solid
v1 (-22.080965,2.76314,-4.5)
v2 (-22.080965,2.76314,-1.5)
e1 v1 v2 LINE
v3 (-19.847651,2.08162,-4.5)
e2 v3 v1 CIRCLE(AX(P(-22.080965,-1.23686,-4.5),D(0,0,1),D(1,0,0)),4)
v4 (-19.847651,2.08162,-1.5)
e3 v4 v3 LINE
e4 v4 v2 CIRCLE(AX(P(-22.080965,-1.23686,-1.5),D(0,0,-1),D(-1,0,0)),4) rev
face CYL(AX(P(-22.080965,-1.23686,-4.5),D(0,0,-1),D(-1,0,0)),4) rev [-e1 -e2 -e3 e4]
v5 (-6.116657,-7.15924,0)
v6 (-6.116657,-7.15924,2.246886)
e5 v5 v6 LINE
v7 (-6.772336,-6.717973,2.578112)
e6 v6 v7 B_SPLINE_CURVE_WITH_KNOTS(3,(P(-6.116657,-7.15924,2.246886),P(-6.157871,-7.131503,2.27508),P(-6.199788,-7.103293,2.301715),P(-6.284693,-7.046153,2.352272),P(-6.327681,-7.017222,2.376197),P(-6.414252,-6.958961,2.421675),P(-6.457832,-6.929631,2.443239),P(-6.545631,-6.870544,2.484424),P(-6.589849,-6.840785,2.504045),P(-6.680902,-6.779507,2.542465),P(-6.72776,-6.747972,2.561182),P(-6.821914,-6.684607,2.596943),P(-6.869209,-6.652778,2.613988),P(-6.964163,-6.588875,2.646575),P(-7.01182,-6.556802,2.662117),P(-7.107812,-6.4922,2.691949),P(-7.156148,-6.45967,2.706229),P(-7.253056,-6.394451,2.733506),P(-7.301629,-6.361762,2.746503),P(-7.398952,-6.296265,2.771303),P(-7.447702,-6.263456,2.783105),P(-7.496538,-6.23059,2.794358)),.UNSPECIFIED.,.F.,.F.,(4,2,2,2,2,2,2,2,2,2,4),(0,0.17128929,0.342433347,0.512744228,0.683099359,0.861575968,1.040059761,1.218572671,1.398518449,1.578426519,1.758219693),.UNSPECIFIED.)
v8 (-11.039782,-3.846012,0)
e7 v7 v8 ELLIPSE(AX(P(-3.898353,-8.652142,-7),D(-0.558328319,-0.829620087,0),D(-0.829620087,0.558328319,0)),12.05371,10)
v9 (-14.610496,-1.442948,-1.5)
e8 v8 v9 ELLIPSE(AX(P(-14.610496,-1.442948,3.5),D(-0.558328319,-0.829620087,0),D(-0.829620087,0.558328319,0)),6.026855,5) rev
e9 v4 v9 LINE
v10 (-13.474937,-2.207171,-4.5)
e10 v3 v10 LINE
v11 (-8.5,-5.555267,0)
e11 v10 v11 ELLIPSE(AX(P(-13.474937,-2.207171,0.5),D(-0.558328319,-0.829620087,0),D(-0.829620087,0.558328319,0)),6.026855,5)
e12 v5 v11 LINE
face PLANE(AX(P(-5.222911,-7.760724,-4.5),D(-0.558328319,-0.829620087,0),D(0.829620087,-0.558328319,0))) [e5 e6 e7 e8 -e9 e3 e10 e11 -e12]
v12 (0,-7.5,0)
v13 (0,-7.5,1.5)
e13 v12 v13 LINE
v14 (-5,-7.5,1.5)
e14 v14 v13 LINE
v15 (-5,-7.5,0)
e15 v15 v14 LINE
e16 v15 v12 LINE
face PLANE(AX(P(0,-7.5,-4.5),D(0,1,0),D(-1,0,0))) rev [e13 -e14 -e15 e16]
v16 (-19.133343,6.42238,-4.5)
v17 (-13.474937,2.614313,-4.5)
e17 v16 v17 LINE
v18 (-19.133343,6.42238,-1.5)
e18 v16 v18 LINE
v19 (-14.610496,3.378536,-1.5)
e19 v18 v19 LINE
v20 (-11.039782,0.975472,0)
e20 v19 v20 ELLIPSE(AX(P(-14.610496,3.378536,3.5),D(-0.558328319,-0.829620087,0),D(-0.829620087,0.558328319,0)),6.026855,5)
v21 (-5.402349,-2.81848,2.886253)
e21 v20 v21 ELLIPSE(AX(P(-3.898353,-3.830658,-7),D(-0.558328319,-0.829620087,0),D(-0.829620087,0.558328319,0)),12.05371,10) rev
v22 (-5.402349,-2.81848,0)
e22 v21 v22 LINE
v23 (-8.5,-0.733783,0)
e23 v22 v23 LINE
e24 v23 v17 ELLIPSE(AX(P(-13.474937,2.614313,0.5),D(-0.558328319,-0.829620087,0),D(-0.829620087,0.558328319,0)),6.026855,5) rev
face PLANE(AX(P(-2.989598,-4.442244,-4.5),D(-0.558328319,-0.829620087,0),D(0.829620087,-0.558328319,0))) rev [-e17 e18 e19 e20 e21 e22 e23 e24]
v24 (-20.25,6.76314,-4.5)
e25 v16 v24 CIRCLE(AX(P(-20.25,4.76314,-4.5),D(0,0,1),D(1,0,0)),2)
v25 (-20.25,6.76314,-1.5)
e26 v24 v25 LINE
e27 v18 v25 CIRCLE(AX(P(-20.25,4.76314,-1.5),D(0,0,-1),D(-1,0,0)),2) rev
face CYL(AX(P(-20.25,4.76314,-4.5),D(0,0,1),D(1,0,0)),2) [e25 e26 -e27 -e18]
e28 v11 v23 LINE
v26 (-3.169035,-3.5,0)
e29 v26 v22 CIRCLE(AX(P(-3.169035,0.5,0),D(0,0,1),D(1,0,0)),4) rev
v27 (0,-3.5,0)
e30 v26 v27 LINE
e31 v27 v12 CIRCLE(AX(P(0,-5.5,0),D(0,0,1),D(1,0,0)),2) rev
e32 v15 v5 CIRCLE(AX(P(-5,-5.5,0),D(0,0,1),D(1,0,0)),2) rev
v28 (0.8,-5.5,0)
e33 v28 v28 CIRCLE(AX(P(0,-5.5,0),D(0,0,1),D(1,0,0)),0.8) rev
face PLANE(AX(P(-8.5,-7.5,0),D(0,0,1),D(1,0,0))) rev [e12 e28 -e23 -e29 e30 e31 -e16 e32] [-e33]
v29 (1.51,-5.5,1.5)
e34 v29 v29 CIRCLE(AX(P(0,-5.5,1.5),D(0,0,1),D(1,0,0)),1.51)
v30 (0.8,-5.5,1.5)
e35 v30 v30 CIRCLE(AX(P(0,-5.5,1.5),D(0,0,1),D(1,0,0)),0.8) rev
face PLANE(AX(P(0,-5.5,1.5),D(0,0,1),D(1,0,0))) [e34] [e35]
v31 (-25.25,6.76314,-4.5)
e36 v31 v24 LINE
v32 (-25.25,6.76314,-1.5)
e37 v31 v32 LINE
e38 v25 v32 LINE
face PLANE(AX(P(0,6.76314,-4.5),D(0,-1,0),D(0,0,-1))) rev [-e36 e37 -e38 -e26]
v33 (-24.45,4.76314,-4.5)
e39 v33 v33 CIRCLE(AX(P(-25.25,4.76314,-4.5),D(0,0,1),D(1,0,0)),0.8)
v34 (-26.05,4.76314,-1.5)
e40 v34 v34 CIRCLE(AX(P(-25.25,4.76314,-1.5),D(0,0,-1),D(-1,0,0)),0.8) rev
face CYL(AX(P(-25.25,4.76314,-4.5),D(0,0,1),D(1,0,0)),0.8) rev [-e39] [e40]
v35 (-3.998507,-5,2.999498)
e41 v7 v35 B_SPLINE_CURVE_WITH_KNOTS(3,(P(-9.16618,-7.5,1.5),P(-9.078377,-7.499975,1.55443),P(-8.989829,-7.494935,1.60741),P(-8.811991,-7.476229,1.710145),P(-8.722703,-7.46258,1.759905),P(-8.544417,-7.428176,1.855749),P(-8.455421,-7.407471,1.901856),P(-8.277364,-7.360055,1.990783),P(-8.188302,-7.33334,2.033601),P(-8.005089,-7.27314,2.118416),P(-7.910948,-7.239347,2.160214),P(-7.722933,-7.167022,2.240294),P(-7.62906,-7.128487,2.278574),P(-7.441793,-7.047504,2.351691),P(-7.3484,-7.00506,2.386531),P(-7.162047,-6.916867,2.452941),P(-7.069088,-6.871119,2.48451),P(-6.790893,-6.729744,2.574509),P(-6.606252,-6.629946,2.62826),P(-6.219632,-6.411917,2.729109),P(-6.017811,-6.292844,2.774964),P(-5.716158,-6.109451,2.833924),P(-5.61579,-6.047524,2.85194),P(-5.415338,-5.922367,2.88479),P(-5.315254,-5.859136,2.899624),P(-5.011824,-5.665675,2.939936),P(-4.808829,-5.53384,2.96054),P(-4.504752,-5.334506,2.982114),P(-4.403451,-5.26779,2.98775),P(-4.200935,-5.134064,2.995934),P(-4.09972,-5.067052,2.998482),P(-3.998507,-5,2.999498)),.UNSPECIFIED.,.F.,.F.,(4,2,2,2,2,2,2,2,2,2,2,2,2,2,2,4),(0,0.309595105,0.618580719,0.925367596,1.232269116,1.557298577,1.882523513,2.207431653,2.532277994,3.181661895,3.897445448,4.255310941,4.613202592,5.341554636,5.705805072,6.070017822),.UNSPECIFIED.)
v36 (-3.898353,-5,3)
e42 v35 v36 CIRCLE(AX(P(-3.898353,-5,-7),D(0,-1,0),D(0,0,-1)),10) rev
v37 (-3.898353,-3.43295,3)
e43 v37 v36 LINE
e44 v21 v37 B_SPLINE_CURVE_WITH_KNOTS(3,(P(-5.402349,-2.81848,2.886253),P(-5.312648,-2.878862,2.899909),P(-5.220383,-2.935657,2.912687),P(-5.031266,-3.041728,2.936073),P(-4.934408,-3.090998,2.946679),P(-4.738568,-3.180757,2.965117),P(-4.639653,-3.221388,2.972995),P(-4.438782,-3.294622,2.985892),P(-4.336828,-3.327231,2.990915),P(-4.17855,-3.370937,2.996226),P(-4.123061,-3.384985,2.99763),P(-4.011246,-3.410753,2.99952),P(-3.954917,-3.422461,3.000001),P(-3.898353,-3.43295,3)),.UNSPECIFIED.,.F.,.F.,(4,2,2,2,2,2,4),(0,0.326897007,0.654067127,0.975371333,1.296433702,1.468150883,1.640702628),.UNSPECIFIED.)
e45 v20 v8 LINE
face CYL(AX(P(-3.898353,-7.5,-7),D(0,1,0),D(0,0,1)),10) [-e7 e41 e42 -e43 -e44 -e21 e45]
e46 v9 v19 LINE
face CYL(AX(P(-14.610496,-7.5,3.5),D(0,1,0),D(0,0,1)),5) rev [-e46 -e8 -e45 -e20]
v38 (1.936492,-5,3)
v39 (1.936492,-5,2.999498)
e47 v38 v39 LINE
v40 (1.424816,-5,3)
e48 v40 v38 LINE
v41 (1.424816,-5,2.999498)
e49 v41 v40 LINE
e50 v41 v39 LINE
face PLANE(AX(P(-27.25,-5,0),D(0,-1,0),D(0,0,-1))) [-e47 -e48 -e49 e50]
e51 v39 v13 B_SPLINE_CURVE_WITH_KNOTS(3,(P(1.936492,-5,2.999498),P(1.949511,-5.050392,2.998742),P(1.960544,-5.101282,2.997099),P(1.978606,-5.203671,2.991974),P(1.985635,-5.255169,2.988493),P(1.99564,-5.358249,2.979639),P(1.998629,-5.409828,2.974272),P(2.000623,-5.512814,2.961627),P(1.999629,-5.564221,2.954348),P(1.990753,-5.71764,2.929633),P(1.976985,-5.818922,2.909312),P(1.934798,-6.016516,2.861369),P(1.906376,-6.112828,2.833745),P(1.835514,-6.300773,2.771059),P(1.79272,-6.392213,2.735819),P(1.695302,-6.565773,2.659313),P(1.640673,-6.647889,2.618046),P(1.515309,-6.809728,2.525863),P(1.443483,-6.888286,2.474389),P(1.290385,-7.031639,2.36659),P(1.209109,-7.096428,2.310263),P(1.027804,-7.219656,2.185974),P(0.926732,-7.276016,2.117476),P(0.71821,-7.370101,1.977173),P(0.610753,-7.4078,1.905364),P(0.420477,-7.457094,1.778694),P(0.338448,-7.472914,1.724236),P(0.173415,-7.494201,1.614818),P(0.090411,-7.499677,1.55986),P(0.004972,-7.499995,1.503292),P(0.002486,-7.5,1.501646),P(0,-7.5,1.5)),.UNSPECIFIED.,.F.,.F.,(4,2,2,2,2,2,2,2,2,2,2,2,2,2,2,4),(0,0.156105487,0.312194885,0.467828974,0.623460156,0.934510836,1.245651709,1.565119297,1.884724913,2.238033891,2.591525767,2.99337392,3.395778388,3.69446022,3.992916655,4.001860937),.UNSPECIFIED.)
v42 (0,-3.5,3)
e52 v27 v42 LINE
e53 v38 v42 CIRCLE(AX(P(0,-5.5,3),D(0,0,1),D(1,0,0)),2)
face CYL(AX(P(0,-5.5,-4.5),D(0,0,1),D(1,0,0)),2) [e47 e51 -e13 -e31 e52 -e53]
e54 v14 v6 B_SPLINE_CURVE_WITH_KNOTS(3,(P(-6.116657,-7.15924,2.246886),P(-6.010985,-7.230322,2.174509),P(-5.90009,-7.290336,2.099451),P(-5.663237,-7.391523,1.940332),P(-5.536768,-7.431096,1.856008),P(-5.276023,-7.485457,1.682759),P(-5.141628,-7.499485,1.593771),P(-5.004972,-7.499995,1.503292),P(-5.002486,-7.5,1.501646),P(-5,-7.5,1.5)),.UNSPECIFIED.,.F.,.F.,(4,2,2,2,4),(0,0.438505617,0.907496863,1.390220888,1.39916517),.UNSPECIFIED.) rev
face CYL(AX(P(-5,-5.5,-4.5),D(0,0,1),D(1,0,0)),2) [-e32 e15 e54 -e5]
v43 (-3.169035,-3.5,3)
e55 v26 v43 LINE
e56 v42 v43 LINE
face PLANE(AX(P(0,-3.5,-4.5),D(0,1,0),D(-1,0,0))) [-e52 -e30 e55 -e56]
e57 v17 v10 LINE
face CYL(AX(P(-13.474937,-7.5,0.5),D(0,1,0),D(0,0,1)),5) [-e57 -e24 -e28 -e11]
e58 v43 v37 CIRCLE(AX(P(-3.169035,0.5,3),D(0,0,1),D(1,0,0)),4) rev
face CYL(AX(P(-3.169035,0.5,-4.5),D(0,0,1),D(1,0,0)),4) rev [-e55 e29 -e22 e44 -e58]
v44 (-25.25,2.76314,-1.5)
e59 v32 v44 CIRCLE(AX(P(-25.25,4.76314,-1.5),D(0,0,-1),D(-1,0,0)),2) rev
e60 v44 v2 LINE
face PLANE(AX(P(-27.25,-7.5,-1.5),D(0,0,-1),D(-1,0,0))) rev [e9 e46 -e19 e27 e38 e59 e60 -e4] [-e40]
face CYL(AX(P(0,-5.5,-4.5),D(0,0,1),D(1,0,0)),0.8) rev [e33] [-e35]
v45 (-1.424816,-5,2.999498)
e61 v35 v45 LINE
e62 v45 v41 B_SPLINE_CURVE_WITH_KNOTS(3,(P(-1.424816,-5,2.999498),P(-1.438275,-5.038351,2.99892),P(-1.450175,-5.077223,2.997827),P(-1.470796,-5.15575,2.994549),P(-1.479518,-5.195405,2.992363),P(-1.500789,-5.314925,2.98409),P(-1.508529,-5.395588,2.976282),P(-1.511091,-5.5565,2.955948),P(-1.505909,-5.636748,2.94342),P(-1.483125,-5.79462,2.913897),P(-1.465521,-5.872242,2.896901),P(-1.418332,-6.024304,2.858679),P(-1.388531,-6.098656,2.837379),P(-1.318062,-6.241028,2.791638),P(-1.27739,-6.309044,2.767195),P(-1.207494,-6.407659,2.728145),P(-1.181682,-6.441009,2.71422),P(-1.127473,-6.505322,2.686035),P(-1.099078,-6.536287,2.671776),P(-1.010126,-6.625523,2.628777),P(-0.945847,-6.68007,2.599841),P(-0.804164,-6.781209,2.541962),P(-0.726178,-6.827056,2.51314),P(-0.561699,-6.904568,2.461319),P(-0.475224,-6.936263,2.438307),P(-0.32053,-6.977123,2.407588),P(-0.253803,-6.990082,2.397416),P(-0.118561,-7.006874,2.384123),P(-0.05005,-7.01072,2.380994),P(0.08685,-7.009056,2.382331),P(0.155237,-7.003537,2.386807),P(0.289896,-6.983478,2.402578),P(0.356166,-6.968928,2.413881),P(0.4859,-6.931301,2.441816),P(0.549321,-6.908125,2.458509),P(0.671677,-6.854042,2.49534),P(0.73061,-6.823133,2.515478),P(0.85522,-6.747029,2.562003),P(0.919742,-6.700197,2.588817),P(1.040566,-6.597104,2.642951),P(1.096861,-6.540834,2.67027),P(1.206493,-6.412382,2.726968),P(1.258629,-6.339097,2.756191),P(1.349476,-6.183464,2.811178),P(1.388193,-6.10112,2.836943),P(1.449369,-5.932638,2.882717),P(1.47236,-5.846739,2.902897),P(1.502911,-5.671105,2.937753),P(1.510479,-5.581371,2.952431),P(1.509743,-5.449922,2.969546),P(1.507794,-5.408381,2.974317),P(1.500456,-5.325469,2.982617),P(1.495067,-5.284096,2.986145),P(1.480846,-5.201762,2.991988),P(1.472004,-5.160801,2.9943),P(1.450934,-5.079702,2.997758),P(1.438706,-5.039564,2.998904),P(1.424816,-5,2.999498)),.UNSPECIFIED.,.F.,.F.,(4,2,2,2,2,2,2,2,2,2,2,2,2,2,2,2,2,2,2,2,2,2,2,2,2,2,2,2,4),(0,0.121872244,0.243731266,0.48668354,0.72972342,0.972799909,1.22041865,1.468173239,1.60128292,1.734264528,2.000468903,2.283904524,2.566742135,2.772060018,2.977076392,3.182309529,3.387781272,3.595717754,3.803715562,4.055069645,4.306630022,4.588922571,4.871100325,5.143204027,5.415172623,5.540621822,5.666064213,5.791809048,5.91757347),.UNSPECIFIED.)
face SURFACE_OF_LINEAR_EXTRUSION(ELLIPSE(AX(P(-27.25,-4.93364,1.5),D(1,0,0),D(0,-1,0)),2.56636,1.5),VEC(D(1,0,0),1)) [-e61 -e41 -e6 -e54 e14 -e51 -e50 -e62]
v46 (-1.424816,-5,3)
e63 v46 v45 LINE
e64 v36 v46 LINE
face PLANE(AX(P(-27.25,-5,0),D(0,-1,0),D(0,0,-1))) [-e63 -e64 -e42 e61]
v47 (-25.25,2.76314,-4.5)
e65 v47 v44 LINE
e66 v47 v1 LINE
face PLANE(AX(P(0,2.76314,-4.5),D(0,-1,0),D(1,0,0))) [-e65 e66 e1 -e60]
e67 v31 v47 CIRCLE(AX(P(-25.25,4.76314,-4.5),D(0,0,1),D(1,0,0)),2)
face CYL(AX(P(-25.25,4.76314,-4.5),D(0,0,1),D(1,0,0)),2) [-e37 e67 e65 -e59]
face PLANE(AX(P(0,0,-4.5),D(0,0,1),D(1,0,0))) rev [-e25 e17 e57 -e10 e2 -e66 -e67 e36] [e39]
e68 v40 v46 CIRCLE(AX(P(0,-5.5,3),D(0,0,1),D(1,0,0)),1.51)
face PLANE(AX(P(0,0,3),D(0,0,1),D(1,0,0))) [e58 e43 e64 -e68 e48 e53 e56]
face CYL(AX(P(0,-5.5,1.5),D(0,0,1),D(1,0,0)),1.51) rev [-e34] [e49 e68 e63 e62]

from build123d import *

# Parameters (mm, degrees)
BOSS_EXTRUDE1_DEPTH      = 3
BOSS_EXTRUDE1_DEPTH_BACK = 4.5
SKETCH1_R                = 0.8
FILLET1_R                = 4
CUT_EXTRUDE2_DEPTH       = 29.619267985
CUT_EXTRUDE2_DEPTH_BACK  = 29.619267985
SKETCH4_W                = 10.5
SKETCH4_H                = 4.5
CUT_EXTRUDE3_DEPTH       = 29.619267985
CUT_EXTRUDE3_DEPTH_BACK  = 29.619267985
SKETCH5_W                = 15
SKETCH5_H                = 4.5
FILLET2_R                = 10
FILLET3_R                = 5
FILLET4_R                = 5
CUT_EXTRUDE4_START       = -6.772335917
CUT_EXTRUDE4_DEPTH       = 8.772335917
SKETCH7_R                = 1.51
CUT_EXTRUDE5_DEPTH       = 1.5


# Read off the part's stored shape, not the designer's step: Cut-Extrude4
with BuildPart() as part:
    # Sketch1 → Boss-Extrude1 (new, two sides: drawn at the far end of the back side and taken through both)
    with BuildSketch(Plane.XY.offset(-BOSS_EXTRUDE1_DEPTH_BACK)):
        with BuildLine():
            Line((-4.389678411, -3.5), (-19.133343362, 6.422379894))
            ThreePointArc((-19.133343362, 6.422379894), (-19.666253628, 6.676053774), (-20.25, 6.763139721))
            Line((-20.25, 6.763139721), (-25.25, 6.763139721))
            ThreePointArc((-25.25, 6.763139721), (-27.246991207, 4.872803379), (-25.468997361, 2.775165839))
            ThreePointArc((-25.468997361, 2.775165839), (-25.359663658, 2.766148514), (-25.25, 2.763139721))
            Line((-25.25, 2.763139721), (-20.860321589, 2.763139721))
            Line((-20.860321589, 2.763139721), (-6.116656638, -7.159240173))
            ThreePointArc((-6.116656638, -7.159240173), (-5.583746372, -7.412914053), (-5, -7.5))
            Line((-5, -7.5), (0, -7.5))
            ThreePointArc((0, -7.5), (1.974370247, -5.81915847), (0.630136986, -3.601862129))
            ThreePointArc((0.630136986, -3.601862129), (0.31915847, -3.525629753), (0, -3.5))
            Line((0, -3.5), (-4.389678411, -3.5))
        make_face()
        with Locations((0, -5.5)):
            Circle(SKETCH1_R, mode=Mode.SUBTRACT)
        with Locations((-25.25, 4.763139721)):
            Circle(SKETCH1_R, mode=Mode.SUBTRACT)
    extrude(amount=BOSS_EXTRUDE1_DEPTH + BOSS_EXTRUDE1_DEPTH_BACK)

    # Fillet1
    fillet1_edges = [part.edges().sort_by_distance(p)[0] for p in [
        (-4.389678411, -3.5, -0.75),
        (-20.860321589, 2.763139721, -0.75),
    ]]
    fillet(fillet1_edges, radius=FILLET1_R)

    # Sketch4 → Cut-Extrude2 (cut, two sides: drawn at the far end of the back side and taken through both)
    with BuildSketch(Plane(origin=(0, 0, 0), x_dir=(1, 0, 0), z_dir=(0, 1, 0)).offset(-CUT_EXTRUDE2_DEPTH_BACK)):
        with Locations((-3.25, 2.25)):
            Rectangle(SKETCH4_W, SKETCH4_H)
    extrude(amount=CUT_EXTRUDE2_DEPTH + CUT_EXTRUDE2_DEPTH_BACK, mode=Mode.SUBTRACT)

    # Sketch5 → Cut-Extrude3 (cut, two sides: drawn at the far end of the back side and taken through both)
    with BuildSketch(Plane(origin=(0, 0, 0), x_dir=(1, 0, 0), z_dir=(0, 1, 0)).offset(-CUT_EXTRUDE3_DEPTH_BACK)):
        with Locations((-19.75, -0.75)):
            Rectangle(SKETCH5_W, SKETCH5_H)
    extrude(amount=CUT_EXTRUDE3_DEPTH + CUT_EXTRUDE3_DEPTH_BACK, mode=Mode.SUBTRACT)

    # Fillet2
    # the kernel refuses this fillet: 10 mm, written as the material it takes off along each edge
    with BuildSketch(Plane(origin=(-12.25, -23.910660804, 3), x_dir=(1.537930276954748e-12, 0, -1.0), z_dir=(0, 1, 0))) as fillet2_piece_1:
        with BuildLine():
            CenterArc((10, -8.351646544), FILLET2_R, 123.367012969, 56.632987031)
            Line((0, -8.351646544), (-0.2, -8.351646544))
            Line((-0.2, -8.351646544), (-0.2, 0))
            Line((-0.2, 0), (0, 0.2))
            ThreePointArc((0, 0.2), (2.25, 0.2), (4.39, 0.167032931))
            Line((4.39, 0.167032931), (4.5, 0))
        make_face()
    extrude(amount=46.579716753, mode=Mode.SUBTRACT)

    # Fillet3
    # the kernel refuses this fillet: 5 mm, written as the material it takes off along each edge
    with BuildSketch(Plane(origin=(-8.5, -17.99261029, -4.5), x_dir=(0, 0, 1), z_dir=(0, 1, 0))) as fillet3_piece_1:
        with BuildLine():
            CenterArc((5, -4.974937186), FILLET3_R, 95.739170477, 84.260829523)
            Line((0, -4.974937186), (-0.1, -4.974937186))
            Line((-0.1, -4.974937186), (-0.1, 0))
            Line((-0.1, 0), (0, 0.1))
            ThreePointArc((0, 0.1), (2.25, 0.1), (4.49, 0.099498744))
            Line((4.49, 0.099498744), (4.5, 0))
        make_face()
    extrude(amount=29.696169959, mode=Mode.SUBTRACT)

    # Fillet4
    fillet4_edges = [part.edges().sort_by_distance(p)[0] for p in [
        (-12.25, -0.620802428, -1.5),
    ]]
    fillet(fillet4_edges, radius=FILLET4_R)

    # Cut-Extrude4 outline → Cut-Extrude4 (cut)
    with BuildSketch(Plane(origin=(0, 0, 0), x_dir=(0, 0, -1), z_dir=(1, 0, 0)).offset(CUT_EXTRUDE4_START)):
        with BuildLine():
            add(Edge.make_bspline(
                [(-2.999498449, -5), (-2.961702123, -7.5), (-1.5, -7.5)],
                knots=[4.738249611, 4.738249611, 4.738249611, 6.283185307, 6.283185307, 6.283185307], degree=2, weights=[1, 0.716190529, 1]))
            Line((-2.999498449, -5), (-3, -5))
            Line((-3, -5), (-3, -7.5))
            Line((-3, -7.5), (-1.5, -7.5))
        make_face()
    extrude(amount=CUT_EXTRUDE4_DEPTH, mode=Mode.SUBTRACT)

    # Sketch7 → Cut-Extrude5 (cut)
    with BuildSketch(Plane.XY.offset(3)):
        with Locations((0, -5.5)):
            Circle(SKETCH7_R)
    extrude(amount=-CUT_EXTRUDE5_DEPTH, mode=Mode.SUBTRACT)


solid = part.part
